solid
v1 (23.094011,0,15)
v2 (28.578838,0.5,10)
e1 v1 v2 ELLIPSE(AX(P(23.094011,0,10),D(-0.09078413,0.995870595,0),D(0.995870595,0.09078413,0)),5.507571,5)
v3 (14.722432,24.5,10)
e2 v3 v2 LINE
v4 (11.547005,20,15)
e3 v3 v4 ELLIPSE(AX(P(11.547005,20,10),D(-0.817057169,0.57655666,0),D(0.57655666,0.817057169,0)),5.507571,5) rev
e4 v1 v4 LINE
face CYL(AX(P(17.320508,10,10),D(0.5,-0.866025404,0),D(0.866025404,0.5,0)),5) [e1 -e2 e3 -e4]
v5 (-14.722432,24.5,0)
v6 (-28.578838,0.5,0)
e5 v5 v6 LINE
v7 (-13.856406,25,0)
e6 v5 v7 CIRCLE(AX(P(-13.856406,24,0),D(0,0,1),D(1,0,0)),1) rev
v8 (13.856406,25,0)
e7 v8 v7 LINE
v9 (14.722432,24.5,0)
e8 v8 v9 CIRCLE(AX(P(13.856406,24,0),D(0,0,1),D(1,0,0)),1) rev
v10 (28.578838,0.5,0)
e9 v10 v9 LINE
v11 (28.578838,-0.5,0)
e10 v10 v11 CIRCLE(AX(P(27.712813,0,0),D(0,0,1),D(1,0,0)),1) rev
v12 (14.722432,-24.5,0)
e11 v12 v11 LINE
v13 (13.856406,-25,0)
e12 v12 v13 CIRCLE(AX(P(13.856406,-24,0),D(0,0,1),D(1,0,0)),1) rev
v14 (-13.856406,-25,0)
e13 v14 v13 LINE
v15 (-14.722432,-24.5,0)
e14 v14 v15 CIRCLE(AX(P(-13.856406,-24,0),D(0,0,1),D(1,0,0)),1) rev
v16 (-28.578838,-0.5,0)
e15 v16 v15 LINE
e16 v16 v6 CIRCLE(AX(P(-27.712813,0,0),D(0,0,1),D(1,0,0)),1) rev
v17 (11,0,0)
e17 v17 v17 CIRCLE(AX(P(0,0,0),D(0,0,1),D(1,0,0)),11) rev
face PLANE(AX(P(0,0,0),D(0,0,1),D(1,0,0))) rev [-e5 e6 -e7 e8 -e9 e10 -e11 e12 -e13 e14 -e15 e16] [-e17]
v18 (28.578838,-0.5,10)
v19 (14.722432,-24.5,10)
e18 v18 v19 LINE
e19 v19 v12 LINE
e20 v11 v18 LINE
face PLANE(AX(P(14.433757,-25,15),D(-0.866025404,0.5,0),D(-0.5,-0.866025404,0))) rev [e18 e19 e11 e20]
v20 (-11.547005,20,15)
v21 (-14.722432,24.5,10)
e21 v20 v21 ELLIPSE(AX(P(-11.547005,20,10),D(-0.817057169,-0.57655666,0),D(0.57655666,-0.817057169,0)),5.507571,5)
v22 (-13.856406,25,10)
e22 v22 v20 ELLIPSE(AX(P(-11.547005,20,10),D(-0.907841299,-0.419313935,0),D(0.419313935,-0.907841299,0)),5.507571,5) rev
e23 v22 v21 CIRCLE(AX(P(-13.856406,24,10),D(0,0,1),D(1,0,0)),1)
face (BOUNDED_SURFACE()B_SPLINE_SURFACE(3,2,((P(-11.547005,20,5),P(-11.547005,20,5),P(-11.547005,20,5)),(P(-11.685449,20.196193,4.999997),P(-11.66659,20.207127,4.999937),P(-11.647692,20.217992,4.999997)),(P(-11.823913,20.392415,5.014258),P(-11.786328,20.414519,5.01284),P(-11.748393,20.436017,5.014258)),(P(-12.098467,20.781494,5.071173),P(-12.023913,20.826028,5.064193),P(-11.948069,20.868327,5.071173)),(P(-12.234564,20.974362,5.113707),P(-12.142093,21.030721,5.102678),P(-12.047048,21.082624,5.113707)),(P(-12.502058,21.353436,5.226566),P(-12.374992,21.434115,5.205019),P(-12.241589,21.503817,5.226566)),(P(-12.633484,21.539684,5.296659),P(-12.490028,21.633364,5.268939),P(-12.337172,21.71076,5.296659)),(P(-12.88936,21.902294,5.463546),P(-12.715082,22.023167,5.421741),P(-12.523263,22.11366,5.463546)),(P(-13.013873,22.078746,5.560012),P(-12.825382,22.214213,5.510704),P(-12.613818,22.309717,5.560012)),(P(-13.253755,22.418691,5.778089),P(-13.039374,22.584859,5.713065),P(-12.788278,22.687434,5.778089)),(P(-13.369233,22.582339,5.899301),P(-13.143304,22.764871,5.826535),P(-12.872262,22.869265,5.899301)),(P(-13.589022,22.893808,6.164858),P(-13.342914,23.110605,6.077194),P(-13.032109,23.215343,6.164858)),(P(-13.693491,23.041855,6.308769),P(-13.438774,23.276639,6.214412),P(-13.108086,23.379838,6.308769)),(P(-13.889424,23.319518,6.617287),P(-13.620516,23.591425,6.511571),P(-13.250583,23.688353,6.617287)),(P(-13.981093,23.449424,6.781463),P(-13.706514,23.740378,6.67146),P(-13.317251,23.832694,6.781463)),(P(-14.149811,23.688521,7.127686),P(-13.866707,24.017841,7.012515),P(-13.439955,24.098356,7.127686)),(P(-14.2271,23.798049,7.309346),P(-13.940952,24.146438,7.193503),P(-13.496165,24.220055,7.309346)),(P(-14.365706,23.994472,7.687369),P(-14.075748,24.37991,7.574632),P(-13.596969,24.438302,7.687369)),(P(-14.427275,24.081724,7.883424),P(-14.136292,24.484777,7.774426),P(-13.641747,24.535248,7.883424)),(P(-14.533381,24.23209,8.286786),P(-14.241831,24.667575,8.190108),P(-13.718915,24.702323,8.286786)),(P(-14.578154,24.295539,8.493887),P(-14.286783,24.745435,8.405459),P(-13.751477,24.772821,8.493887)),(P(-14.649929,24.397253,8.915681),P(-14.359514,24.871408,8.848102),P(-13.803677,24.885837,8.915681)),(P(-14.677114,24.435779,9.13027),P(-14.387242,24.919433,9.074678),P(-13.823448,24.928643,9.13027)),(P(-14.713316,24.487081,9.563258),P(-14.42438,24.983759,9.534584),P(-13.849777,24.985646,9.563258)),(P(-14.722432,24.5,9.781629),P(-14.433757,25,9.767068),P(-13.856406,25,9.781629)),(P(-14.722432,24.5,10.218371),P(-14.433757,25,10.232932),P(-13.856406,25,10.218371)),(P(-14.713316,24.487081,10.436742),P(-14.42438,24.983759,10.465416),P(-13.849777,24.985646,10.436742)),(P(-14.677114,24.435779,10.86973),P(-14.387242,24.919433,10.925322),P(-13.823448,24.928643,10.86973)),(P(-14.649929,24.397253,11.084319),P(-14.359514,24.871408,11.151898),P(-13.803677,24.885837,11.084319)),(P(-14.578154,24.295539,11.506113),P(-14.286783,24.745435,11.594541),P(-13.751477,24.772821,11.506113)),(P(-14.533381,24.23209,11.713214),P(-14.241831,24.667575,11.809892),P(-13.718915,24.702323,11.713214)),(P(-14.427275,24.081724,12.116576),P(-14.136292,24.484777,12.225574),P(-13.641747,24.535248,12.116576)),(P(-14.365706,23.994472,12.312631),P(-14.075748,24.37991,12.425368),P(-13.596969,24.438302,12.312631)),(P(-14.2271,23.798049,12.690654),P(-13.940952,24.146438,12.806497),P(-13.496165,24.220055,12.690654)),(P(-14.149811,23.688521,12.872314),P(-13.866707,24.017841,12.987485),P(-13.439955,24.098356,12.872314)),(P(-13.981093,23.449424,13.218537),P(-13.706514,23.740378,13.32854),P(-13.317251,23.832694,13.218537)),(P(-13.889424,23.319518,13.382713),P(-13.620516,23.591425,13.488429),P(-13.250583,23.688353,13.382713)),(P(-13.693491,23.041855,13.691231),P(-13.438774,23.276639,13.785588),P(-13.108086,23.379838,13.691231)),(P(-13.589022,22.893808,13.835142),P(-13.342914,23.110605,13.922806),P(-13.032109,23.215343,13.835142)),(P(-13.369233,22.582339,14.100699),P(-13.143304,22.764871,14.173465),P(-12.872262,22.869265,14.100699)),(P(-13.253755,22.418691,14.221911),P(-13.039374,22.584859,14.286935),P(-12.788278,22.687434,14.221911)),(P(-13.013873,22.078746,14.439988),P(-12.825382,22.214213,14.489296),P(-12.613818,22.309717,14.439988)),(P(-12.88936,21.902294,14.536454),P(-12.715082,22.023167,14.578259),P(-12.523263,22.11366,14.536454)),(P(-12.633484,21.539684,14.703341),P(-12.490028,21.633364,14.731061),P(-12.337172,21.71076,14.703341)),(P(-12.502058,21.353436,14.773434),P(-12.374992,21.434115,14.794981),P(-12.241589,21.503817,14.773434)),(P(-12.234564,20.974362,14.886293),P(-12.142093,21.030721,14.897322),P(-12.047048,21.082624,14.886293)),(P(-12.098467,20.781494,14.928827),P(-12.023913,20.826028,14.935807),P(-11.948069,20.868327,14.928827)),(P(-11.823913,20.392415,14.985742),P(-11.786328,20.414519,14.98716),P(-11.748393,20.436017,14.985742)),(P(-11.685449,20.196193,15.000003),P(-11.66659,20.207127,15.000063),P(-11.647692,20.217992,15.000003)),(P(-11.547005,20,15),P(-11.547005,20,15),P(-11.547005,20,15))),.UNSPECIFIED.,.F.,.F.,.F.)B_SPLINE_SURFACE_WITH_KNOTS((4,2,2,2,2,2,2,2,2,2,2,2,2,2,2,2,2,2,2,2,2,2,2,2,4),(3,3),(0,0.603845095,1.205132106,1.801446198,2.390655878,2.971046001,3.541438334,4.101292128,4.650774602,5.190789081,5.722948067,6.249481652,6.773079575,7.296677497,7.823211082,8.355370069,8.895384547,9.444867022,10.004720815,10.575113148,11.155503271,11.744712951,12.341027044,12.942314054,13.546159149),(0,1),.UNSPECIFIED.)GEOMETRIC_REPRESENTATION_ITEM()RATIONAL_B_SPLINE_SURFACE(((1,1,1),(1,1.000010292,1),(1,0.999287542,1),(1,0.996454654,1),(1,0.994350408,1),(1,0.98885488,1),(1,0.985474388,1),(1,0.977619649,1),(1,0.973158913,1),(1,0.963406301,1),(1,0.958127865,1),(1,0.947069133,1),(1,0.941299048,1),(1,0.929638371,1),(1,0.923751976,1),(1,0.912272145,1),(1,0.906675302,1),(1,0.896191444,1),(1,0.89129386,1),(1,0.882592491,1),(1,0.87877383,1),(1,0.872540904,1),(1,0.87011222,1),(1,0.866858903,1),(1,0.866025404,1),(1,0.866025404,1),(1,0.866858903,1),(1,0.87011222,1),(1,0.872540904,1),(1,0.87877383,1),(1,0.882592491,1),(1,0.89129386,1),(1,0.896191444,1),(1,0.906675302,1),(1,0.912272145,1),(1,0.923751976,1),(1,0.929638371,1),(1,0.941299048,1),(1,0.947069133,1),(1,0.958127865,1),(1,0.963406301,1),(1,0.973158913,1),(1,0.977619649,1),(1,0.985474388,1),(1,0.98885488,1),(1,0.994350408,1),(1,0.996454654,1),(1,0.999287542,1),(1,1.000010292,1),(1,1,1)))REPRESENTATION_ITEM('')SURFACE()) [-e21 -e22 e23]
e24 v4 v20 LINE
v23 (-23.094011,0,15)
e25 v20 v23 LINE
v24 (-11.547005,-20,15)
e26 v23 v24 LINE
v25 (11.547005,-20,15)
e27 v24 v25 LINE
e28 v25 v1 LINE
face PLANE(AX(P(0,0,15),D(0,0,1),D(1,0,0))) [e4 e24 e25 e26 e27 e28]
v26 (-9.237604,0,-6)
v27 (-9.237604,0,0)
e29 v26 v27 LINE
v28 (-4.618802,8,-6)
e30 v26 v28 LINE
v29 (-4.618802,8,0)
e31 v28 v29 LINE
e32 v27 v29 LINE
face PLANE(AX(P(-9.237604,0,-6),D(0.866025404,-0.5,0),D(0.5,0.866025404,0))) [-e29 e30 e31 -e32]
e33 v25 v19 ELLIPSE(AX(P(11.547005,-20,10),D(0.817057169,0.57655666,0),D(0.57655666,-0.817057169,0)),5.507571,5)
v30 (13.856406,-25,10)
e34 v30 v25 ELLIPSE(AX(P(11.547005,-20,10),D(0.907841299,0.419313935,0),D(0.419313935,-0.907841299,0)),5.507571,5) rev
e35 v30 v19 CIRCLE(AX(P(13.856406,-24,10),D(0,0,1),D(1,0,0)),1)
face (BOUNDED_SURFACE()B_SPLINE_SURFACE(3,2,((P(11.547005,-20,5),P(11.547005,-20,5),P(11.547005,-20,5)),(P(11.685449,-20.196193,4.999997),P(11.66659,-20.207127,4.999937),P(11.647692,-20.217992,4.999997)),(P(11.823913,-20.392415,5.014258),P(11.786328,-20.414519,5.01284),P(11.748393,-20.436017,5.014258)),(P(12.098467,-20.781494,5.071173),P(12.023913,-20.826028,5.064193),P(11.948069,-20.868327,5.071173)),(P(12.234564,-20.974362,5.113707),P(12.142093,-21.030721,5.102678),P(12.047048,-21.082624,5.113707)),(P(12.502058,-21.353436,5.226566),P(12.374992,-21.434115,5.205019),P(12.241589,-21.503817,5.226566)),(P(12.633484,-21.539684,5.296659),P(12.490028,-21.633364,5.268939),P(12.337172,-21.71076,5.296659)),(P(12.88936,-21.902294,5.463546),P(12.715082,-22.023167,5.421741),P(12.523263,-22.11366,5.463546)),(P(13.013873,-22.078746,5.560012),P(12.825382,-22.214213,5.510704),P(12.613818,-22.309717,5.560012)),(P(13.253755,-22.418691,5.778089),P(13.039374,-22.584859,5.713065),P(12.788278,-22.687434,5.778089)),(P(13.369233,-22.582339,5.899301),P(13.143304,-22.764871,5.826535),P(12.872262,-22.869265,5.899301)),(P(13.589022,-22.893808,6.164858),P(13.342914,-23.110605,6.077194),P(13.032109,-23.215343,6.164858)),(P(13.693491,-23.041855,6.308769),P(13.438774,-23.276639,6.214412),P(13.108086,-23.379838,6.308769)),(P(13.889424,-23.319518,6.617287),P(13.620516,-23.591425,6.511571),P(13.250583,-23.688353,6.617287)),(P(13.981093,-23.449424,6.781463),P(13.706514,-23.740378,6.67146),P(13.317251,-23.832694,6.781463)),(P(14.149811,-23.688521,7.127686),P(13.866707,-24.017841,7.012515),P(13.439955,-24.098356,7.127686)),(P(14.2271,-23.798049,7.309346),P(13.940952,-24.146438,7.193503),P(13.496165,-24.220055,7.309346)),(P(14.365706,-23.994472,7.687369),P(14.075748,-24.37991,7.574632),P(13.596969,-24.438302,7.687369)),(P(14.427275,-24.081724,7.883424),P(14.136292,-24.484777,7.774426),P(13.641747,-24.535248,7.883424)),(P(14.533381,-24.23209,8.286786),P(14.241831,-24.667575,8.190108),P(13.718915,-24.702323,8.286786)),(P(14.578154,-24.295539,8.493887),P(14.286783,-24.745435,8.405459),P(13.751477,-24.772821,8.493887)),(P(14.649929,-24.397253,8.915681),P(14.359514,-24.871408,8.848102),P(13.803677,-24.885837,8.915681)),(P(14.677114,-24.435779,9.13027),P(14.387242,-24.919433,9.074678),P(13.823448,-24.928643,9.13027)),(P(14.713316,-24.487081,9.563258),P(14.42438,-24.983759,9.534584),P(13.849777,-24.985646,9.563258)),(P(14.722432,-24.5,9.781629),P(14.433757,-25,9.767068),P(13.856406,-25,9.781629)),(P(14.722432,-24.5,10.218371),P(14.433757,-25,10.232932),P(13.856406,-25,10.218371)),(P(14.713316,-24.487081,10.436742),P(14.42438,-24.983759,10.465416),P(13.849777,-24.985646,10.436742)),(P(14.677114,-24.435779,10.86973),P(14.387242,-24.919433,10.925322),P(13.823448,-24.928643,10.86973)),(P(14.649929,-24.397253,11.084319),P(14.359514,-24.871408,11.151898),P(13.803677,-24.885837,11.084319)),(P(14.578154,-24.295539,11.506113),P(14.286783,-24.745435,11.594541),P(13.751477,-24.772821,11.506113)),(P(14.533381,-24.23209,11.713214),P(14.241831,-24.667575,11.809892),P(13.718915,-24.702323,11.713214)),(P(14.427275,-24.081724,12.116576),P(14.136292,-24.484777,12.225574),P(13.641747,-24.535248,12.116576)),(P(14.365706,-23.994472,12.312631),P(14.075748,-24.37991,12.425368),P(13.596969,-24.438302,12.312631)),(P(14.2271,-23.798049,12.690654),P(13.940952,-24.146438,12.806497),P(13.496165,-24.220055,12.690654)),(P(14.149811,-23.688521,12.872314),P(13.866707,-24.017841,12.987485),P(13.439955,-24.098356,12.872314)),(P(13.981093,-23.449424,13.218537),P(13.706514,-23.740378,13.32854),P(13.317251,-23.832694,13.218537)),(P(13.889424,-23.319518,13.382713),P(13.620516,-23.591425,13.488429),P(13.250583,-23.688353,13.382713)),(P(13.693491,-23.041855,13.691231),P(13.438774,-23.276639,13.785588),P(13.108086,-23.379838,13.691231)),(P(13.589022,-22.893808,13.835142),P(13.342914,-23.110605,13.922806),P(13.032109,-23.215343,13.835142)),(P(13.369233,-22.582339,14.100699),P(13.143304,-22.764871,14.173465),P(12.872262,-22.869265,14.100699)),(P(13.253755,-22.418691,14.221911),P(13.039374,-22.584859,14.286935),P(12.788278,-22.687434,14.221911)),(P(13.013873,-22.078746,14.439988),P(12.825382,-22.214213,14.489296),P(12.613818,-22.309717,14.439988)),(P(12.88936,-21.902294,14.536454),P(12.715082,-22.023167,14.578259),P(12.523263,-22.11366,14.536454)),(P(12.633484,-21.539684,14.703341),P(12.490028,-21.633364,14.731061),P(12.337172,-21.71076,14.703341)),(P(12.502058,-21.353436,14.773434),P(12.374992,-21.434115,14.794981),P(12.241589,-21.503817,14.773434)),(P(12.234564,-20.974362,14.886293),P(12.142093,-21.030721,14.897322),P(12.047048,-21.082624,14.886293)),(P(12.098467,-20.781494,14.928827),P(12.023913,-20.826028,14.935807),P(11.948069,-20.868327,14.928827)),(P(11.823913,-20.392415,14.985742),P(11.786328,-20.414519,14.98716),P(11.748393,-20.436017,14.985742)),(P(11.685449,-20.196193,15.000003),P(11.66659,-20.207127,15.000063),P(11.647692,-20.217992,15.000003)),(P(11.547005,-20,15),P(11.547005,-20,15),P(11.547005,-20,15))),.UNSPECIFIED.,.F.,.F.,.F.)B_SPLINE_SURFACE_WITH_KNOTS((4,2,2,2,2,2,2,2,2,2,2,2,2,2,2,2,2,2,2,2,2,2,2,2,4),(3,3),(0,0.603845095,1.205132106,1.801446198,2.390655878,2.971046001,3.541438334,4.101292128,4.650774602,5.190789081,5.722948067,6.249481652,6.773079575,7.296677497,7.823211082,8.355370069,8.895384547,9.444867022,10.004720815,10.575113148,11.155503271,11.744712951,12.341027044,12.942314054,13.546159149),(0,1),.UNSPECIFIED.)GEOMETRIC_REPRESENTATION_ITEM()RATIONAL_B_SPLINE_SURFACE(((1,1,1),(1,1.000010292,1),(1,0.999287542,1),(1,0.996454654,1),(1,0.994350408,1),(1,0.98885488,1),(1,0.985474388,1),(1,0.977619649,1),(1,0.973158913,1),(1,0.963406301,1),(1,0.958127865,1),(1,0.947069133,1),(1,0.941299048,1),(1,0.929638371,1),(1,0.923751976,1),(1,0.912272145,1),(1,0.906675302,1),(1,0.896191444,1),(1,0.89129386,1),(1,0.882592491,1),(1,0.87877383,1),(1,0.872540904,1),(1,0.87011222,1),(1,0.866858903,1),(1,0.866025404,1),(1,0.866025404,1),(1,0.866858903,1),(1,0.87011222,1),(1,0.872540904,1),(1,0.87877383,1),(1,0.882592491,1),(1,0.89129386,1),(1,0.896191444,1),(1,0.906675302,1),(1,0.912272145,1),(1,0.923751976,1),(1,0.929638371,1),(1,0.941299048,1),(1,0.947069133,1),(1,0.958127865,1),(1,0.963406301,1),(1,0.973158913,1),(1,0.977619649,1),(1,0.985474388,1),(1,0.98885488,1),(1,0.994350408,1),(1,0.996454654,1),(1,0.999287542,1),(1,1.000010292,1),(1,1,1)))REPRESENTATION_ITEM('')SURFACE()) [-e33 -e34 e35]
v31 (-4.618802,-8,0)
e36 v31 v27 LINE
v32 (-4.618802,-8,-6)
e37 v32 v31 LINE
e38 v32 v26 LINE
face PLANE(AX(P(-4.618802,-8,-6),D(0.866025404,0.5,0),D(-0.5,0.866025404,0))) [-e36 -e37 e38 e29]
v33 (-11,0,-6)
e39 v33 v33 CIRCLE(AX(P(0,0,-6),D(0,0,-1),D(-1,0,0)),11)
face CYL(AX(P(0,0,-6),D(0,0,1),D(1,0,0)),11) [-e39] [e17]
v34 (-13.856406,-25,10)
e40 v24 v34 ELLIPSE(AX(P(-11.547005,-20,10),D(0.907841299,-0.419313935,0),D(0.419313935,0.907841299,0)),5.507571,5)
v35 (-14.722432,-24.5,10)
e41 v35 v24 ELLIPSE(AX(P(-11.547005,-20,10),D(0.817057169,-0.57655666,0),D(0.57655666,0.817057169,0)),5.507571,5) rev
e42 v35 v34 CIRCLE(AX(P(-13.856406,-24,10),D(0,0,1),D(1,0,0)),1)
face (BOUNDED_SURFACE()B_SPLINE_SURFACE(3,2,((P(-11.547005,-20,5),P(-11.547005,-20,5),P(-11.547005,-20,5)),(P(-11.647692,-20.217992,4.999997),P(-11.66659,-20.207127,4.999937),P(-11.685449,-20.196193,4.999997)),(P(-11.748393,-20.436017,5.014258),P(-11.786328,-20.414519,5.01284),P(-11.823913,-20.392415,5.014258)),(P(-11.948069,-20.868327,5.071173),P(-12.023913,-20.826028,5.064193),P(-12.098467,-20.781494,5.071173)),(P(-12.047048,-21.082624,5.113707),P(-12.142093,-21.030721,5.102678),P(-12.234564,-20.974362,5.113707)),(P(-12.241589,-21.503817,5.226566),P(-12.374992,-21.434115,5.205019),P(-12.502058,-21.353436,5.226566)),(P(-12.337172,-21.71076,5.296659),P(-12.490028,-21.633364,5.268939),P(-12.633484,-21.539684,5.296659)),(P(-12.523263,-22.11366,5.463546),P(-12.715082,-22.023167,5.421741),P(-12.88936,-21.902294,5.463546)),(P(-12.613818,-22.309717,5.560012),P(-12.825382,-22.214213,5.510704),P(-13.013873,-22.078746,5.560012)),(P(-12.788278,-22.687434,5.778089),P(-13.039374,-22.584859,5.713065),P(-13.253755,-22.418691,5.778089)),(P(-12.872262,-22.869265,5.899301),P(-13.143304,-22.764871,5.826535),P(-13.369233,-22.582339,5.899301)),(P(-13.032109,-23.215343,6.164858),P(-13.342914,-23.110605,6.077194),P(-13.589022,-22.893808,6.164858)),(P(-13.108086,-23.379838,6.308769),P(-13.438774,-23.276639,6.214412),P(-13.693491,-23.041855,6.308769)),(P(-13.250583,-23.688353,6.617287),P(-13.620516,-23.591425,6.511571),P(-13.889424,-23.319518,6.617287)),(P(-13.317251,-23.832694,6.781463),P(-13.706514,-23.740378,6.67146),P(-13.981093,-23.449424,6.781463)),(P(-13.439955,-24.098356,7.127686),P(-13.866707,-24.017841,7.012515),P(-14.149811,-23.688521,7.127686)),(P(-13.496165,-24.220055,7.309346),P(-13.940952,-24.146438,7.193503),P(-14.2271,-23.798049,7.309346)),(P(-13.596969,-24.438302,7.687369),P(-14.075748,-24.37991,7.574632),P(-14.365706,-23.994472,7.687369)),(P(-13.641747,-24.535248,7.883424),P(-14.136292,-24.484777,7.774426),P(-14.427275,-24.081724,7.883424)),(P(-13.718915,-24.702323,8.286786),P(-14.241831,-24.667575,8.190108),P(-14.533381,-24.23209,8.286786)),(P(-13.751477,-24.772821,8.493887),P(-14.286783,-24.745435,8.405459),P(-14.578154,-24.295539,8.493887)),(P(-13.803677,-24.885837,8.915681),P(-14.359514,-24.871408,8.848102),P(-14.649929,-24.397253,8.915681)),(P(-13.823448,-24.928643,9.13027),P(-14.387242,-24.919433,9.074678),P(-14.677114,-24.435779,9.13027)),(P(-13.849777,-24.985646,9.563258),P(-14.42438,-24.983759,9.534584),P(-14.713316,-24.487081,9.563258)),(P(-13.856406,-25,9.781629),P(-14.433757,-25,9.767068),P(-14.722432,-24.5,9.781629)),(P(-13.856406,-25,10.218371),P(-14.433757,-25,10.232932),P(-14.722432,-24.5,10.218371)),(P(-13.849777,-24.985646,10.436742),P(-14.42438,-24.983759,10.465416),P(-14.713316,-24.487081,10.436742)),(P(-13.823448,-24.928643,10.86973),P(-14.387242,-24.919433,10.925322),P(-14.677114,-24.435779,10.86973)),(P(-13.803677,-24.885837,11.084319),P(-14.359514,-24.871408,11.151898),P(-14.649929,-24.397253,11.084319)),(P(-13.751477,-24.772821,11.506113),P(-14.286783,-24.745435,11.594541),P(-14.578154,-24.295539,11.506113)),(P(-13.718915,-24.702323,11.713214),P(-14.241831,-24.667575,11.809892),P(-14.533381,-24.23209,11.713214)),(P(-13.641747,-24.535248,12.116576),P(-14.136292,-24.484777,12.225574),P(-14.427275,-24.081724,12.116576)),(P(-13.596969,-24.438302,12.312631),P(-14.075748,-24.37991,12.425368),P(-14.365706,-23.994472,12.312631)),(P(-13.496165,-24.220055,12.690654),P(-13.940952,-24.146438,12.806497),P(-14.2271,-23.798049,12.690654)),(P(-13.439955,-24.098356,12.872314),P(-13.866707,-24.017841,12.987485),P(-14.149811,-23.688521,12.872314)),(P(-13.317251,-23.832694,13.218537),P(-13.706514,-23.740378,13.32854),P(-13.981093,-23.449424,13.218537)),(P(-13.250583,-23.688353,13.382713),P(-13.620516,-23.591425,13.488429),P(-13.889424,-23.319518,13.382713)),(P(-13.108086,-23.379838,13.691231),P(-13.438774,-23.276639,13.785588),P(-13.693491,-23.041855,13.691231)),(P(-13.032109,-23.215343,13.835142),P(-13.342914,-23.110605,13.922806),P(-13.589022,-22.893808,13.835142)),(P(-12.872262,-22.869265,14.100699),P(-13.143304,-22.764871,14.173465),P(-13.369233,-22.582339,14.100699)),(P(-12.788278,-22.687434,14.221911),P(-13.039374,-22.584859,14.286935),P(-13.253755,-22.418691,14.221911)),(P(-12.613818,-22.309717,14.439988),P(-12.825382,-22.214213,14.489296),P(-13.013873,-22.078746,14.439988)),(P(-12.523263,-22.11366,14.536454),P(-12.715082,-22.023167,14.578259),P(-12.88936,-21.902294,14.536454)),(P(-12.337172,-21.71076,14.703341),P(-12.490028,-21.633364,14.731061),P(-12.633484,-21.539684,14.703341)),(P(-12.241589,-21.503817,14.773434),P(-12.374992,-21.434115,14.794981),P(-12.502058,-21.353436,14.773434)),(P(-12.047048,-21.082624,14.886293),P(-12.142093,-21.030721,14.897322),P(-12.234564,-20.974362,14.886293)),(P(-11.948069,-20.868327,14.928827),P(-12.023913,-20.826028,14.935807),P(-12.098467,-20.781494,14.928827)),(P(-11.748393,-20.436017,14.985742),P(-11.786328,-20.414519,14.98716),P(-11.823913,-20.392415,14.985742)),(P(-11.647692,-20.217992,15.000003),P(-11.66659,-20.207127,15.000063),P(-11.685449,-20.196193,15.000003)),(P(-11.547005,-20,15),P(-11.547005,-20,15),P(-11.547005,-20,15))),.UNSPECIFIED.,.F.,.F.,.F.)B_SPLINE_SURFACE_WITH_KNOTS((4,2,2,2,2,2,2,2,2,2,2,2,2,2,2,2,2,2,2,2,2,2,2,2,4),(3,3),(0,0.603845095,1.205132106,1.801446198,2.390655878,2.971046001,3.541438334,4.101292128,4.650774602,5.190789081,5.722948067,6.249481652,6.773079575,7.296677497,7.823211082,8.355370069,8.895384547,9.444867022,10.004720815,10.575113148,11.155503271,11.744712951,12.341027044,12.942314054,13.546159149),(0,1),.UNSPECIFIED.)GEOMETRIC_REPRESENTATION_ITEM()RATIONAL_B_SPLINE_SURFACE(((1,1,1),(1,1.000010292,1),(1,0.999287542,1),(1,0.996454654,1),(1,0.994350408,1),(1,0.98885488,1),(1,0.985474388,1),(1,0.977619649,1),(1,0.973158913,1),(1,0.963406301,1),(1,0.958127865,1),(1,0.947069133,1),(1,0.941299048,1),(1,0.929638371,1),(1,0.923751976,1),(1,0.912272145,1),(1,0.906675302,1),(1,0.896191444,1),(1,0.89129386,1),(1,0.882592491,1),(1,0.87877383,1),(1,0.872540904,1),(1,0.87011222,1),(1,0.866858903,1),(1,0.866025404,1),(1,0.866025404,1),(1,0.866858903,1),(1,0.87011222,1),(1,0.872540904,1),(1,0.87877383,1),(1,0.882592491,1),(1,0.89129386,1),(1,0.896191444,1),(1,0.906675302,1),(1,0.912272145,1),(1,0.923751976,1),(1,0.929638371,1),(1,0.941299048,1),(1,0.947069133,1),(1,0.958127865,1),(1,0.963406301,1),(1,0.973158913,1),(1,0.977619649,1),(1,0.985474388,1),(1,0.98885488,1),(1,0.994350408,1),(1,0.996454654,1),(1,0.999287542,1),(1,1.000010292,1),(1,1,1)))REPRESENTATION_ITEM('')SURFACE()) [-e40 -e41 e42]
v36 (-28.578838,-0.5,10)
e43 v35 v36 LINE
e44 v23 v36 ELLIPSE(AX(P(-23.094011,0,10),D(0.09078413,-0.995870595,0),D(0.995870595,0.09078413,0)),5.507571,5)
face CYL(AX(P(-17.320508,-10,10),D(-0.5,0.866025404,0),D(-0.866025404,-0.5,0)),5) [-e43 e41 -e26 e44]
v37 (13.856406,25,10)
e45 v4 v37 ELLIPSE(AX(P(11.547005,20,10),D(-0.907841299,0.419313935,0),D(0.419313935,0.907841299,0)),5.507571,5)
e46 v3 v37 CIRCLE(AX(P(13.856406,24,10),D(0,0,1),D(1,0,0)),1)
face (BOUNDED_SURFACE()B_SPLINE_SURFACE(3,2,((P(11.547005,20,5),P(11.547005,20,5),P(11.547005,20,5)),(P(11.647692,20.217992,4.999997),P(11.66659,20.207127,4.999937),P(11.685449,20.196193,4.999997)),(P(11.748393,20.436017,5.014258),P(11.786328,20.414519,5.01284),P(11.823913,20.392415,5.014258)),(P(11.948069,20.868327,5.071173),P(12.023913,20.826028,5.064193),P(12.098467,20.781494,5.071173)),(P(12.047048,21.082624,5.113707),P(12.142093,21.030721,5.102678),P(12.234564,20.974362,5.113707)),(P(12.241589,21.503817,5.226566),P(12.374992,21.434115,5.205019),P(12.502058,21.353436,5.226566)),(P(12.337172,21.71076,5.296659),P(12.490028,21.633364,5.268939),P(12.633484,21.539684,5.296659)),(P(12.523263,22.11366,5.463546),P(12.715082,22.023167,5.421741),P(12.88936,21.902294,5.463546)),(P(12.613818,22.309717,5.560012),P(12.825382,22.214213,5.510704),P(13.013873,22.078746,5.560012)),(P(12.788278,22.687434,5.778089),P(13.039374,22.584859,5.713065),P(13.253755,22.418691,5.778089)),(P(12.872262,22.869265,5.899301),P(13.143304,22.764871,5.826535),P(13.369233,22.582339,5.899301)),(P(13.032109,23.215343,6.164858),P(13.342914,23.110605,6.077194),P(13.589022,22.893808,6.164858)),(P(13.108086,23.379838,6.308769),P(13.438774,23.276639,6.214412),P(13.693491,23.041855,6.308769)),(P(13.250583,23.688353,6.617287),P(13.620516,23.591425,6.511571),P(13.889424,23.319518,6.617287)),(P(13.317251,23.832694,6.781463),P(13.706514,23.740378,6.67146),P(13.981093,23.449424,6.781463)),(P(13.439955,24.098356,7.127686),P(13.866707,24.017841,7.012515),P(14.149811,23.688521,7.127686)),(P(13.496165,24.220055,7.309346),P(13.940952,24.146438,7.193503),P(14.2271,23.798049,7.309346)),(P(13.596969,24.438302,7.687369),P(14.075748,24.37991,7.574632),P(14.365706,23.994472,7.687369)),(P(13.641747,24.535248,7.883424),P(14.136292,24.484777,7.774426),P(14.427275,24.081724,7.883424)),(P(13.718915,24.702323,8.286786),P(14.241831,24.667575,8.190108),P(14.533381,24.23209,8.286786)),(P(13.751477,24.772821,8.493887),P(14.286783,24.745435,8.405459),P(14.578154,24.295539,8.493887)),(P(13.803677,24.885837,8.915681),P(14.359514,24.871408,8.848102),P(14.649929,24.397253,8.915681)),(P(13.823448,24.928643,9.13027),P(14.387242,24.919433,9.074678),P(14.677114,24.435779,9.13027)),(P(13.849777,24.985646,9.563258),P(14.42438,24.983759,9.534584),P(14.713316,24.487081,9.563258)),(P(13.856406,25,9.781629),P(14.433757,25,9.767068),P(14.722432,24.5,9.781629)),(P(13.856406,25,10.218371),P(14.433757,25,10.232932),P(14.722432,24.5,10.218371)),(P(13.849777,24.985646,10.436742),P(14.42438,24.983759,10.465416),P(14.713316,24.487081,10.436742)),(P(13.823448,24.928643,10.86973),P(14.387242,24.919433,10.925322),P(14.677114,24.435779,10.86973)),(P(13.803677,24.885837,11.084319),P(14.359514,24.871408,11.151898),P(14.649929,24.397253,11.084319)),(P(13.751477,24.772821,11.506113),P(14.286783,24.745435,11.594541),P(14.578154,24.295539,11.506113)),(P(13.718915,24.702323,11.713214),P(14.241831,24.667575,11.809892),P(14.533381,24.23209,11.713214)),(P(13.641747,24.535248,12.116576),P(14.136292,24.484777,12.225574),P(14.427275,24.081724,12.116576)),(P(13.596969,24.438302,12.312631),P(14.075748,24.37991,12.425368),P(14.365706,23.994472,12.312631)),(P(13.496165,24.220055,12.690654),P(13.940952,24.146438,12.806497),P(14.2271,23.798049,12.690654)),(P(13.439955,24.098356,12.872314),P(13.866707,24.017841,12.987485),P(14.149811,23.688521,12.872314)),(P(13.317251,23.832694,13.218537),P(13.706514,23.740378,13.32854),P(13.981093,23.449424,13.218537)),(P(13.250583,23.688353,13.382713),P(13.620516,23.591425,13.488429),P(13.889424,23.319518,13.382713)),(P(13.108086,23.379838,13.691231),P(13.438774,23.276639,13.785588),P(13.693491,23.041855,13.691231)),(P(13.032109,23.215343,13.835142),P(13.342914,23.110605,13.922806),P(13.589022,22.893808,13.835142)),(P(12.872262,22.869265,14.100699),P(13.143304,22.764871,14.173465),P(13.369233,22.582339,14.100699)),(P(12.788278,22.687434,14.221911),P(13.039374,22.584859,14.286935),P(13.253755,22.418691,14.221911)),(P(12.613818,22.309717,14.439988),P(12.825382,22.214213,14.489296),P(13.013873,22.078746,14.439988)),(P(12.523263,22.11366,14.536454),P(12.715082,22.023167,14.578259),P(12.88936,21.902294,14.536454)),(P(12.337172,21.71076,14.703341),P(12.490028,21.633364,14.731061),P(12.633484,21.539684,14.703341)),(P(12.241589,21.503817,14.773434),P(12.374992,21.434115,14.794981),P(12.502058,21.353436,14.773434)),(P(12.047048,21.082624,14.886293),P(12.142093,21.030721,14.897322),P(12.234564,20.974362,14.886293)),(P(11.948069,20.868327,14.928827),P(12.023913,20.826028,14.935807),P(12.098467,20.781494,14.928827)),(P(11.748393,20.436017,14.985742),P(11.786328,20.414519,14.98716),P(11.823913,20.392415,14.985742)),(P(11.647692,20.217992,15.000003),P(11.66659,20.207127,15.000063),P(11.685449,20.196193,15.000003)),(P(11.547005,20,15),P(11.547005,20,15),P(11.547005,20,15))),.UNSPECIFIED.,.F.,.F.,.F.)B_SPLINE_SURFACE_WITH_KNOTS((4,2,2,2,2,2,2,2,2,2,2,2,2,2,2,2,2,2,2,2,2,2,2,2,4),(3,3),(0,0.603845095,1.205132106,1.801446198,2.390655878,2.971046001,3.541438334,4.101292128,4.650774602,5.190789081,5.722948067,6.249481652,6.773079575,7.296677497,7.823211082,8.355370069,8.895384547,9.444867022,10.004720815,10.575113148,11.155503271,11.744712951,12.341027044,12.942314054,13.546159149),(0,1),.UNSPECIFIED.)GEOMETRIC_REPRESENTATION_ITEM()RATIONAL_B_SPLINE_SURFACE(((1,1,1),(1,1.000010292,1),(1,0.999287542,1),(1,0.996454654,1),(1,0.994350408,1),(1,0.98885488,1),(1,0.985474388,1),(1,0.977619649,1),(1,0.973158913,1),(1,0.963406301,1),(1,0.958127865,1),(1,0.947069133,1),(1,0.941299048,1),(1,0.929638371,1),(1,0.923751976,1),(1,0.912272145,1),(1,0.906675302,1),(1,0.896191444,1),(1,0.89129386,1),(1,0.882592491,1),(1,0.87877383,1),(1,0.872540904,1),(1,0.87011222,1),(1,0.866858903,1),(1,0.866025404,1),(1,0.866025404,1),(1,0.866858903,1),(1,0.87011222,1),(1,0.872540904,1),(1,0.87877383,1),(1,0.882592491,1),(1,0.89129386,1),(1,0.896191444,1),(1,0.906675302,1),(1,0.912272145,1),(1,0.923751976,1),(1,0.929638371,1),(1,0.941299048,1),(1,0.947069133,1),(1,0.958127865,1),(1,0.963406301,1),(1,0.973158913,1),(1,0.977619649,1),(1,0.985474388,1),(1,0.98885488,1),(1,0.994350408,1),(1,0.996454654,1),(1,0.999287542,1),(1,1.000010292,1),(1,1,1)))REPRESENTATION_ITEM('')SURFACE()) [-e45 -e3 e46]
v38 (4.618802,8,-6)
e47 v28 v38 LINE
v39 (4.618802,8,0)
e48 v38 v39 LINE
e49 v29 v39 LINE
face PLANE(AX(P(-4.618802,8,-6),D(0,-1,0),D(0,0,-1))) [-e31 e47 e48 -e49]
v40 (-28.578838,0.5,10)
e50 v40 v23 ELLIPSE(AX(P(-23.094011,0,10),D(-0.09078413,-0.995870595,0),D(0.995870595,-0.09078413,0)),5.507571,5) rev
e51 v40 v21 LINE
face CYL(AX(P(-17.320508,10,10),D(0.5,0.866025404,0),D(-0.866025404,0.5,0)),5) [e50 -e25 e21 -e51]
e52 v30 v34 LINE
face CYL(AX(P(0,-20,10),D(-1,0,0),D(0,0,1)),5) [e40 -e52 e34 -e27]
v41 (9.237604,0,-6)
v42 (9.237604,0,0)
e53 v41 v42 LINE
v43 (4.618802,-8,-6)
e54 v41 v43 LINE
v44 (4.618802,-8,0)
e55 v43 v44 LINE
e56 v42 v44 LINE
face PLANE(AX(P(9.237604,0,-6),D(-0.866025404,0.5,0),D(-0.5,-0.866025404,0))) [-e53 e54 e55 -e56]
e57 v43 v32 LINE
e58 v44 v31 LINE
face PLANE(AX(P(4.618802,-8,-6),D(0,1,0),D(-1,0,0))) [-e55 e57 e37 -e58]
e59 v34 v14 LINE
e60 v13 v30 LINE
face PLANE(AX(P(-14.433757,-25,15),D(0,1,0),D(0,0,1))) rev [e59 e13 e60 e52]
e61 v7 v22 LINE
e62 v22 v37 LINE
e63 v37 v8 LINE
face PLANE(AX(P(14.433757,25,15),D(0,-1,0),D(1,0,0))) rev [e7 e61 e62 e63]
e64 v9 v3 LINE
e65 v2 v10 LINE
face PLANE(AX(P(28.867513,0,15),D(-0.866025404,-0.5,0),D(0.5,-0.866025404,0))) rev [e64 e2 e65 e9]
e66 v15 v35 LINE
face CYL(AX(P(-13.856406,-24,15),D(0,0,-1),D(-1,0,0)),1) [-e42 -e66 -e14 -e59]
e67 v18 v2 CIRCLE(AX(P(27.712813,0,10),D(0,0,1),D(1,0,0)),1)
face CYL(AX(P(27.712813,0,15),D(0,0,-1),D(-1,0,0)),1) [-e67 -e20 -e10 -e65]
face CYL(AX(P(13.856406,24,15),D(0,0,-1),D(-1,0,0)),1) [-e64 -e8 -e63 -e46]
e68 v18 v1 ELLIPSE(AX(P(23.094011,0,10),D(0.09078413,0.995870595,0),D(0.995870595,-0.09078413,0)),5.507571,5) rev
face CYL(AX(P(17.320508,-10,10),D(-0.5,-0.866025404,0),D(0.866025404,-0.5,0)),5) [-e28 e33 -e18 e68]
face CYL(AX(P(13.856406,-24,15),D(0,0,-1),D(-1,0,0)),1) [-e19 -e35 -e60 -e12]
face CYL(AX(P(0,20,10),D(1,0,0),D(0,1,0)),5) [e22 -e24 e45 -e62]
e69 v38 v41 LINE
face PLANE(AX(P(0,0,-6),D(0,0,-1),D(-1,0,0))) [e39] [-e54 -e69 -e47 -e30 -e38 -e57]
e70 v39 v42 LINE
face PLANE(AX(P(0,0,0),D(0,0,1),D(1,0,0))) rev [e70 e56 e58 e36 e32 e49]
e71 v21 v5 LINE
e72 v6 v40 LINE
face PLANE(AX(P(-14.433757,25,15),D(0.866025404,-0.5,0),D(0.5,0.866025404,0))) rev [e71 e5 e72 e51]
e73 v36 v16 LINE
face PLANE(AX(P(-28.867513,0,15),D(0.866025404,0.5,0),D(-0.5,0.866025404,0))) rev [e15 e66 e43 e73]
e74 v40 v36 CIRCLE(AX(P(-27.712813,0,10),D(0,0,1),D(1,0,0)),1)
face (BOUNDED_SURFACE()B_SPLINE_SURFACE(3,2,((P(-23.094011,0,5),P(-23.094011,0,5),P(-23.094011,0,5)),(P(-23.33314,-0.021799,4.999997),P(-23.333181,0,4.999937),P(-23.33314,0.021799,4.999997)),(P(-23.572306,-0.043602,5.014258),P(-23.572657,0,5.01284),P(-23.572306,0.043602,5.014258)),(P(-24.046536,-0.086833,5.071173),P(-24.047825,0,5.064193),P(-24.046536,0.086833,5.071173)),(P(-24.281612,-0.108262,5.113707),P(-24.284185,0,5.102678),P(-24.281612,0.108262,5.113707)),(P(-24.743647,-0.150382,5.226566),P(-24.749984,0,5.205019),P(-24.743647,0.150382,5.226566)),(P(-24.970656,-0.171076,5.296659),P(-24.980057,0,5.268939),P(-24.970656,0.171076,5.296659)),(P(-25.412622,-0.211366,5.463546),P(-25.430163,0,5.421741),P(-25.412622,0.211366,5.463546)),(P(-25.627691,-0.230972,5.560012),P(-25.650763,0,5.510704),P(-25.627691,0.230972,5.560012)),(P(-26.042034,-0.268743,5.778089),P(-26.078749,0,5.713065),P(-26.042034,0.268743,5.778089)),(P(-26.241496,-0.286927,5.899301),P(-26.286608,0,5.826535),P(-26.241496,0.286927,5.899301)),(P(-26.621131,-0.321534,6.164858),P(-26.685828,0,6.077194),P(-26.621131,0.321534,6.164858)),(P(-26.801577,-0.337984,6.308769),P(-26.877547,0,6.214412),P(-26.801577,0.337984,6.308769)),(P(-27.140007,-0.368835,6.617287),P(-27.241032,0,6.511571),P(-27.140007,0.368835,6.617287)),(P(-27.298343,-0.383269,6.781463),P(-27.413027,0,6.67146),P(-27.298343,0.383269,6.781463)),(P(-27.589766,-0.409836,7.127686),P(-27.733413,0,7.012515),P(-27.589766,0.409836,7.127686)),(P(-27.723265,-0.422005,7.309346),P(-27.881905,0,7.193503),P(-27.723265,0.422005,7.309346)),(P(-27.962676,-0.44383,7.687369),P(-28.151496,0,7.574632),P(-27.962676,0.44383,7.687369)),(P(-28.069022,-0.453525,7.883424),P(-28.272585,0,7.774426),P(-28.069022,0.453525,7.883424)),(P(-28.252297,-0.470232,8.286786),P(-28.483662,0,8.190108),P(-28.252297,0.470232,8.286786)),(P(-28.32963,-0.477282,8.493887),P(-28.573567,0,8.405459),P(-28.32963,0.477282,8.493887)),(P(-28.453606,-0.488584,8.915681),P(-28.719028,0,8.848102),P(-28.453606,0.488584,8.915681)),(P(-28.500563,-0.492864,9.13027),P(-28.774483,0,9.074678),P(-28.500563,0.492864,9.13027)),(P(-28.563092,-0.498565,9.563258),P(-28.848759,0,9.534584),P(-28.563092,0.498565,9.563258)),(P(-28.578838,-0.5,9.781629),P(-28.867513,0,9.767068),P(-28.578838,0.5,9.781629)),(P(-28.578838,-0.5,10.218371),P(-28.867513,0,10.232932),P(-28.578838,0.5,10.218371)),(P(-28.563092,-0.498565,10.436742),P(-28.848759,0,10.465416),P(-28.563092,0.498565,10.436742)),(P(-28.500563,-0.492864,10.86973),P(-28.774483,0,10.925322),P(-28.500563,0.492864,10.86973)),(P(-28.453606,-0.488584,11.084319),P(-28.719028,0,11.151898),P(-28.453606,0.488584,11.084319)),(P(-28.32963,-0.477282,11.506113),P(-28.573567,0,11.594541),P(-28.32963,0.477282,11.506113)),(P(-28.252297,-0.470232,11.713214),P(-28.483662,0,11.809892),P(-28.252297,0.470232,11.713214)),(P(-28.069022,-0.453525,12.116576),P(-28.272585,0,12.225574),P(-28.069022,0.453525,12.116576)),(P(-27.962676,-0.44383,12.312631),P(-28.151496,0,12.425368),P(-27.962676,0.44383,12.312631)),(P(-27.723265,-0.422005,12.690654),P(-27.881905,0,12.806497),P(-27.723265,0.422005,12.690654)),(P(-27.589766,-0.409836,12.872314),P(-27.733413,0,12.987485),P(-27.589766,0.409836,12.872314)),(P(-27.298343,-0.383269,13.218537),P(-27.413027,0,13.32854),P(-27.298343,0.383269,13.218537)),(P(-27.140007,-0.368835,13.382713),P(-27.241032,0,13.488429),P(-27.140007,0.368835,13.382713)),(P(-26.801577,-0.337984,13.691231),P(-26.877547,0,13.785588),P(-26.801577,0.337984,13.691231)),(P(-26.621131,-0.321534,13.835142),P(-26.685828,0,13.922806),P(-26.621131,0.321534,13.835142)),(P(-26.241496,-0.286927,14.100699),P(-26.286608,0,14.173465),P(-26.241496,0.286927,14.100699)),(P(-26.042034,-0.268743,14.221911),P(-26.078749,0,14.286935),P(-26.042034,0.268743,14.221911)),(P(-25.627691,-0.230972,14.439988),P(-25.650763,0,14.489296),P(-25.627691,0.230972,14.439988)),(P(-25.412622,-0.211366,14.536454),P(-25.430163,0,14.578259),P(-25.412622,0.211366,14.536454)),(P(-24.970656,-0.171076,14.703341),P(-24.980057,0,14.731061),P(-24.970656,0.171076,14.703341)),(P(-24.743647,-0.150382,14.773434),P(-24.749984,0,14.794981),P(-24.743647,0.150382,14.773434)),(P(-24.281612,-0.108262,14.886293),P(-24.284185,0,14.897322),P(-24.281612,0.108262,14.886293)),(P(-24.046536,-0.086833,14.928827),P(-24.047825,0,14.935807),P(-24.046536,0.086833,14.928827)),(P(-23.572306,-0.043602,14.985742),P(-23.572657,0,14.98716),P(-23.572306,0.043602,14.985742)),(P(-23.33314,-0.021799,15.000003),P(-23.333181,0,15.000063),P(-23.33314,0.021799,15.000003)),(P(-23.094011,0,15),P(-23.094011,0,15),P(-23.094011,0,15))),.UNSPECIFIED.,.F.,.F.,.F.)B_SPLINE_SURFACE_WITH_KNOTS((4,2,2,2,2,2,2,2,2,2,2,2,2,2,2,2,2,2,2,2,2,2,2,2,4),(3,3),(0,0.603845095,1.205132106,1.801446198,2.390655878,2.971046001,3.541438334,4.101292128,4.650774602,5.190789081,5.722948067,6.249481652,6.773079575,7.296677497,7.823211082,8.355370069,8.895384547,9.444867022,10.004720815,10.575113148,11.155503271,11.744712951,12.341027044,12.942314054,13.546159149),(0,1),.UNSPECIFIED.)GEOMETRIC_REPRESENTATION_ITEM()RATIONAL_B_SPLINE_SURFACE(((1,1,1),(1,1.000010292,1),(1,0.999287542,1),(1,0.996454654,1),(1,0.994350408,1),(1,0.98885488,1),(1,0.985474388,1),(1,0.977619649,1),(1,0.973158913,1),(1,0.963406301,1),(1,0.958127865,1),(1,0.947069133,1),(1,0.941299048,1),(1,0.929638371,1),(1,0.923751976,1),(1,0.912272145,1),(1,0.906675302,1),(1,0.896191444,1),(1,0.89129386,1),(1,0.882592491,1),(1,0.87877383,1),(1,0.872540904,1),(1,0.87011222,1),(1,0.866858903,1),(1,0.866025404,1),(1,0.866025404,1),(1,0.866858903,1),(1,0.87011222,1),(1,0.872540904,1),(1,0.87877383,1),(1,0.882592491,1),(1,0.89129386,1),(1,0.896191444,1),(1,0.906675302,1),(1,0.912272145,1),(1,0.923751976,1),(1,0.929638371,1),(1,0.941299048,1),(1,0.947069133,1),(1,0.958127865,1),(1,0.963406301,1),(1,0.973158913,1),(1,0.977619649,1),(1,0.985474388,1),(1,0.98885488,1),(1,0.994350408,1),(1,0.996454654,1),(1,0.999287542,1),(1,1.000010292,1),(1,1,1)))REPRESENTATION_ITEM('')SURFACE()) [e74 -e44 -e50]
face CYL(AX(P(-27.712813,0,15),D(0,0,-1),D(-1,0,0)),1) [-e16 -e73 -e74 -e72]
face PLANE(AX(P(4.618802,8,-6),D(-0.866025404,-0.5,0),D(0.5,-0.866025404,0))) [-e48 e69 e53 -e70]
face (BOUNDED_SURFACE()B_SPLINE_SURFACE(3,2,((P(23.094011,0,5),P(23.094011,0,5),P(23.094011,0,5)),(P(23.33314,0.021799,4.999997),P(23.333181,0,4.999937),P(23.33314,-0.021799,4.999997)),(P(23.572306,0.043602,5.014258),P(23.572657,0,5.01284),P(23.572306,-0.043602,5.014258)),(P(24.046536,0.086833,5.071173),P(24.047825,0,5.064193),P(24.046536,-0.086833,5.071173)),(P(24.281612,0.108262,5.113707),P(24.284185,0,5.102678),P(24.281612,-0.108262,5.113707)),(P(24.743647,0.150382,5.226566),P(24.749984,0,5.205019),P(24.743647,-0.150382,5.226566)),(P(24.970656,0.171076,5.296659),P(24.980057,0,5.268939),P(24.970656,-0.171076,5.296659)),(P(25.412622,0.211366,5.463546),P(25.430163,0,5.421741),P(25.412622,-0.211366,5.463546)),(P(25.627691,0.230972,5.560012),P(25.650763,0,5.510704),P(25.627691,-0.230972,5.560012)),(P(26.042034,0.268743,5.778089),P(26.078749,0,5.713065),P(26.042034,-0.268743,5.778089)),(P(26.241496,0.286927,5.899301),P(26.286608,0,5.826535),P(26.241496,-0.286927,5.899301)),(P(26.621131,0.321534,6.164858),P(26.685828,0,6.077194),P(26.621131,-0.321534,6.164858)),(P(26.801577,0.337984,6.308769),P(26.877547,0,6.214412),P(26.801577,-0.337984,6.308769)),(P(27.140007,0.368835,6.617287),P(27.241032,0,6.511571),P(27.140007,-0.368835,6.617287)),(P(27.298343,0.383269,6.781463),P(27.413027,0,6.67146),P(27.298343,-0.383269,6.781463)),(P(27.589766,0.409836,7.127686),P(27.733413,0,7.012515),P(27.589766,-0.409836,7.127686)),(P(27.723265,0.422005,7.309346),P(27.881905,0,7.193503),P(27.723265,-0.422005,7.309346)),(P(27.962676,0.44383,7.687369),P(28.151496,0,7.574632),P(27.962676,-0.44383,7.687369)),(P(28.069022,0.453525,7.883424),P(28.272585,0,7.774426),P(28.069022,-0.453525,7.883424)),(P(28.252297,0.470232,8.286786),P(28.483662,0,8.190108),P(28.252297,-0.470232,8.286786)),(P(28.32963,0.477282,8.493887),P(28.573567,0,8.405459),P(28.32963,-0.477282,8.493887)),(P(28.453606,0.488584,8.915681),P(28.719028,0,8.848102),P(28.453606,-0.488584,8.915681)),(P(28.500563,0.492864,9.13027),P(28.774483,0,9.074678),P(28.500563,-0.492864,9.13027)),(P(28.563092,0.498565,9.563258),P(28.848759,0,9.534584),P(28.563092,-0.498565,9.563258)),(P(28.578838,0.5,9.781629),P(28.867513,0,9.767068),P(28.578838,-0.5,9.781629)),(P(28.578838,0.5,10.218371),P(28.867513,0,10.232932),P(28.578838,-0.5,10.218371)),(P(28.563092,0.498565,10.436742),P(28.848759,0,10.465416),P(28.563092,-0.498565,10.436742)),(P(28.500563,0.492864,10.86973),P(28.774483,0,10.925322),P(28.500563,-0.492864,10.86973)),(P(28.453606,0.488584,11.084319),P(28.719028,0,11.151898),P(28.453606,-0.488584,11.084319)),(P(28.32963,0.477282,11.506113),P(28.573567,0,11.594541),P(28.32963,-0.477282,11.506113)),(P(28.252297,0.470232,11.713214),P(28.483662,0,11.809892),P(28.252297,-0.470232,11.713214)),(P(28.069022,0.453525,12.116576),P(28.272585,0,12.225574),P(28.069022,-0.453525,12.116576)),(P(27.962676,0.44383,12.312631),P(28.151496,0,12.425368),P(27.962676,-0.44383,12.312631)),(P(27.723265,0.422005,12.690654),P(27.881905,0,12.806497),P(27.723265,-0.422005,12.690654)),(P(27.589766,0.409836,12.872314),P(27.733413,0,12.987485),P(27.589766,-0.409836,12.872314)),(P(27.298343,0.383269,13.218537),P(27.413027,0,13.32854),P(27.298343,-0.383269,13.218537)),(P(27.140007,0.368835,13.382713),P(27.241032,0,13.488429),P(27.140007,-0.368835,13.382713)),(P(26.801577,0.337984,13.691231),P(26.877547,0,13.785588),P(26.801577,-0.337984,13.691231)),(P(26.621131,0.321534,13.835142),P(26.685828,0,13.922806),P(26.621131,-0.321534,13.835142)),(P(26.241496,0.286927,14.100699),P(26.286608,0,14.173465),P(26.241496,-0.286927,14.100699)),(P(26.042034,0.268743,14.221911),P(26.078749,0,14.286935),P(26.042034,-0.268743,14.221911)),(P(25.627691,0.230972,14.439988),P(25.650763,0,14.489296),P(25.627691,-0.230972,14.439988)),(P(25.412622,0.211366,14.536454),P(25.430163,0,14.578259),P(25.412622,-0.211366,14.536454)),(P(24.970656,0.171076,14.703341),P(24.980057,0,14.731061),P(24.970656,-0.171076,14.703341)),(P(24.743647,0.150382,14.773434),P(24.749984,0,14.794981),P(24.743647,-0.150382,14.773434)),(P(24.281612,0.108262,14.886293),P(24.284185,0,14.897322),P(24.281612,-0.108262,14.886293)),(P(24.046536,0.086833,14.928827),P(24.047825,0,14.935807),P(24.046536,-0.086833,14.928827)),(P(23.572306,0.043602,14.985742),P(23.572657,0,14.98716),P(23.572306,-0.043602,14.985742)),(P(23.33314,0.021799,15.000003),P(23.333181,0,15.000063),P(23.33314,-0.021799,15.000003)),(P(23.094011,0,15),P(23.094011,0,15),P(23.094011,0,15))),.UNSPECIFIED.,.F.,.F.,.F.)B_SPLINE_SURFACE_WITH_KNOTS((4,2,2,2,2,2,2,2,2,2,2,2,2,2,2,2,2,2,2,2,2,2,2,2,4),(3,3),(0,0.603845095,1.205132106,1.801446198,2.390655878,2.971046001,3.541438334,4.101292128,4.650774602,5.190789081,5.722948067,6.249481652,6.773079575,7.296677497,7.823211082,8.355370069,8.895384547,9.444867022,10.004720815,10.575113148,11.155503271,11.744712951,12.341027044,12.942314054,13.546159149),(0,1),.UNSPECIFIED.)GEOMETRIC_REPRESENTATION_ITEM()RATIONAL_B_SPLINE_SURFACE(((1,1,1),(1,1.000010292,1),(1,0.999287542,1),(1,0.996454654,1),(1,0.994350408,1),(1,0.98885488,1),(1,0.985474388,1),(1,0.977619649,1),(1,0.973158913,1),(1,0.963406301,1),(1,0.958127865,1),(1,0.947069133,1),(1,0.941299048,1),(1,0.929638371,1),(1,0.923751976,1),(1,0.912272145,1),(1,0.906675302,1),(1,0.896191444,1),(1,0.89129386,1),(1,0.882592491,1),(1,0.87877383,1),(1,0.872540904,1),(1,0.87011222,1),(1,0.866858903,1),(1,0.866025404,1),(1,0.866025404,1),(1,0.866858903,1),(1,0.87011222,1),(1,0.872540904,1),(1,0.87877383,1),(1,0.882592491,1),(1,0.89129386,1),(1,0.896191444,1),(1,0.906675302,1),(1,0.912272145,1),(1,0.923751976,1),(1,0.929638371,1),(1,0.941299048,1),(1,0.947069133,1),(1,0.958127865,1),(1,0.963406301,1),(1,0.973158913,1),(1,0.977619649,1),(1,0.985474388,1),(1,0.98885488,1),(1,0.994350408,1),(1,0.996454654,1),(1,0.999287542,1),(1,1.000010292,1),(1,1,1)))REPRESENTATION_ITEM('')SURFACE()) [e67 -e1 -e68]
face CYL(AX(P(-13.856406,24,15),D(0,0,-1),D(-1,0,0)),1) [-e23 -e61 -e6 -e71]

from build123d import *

# Parameters (mm, degrees)
DODANIE_WYCI_GNI_CIE1_DEPTH = 15
ZAOKR_GLENIE1_R             = 5
ZAOKR_GLENIE2_R             = 1
SZKIC3_R                    = 11
DODANIE_WYCI_GNI_CIE2_DEPTH = 6


with BuildPart() as part:
    # Szkic1 → Dodanie-wyciągnięcie1 (new body)
    with BuildSketch(Plane.XY):
        Polygon((14.43375673, -25), (28.867513459, 0), (14.43375673, 25), (-14.43375673, 25), (-28.867513459, 0), (-14.43375673, -25), align=None)
    extrude(amount=DODANIE_WYCI_GNI_CIE1_DEPTH)

    # Zaokrąglenie1
    zaokr_glenie1_edges = [part.edges().sort_by_distance(p)[0] for p in [
        (0, 25, 15),
        (-21.650635095, 12.5, 15),
        (-21.650635095, -12.5, 15),
        (0, -25, 15),
        (21.650635095, -12.5, 15),
        (21.650635095, 12.5, 15),
    ]]
    fillet(zaokr_glenie1_edges, radius=ZAOKR_GLENIE1_R)

    # Zaokrąglenie2
    zaokr_glenie2_edges = [part.edges().sort_by_distance(p)[0] for p in [
        (-13.514121691, 23.407145389, 13.65942076),
        (-27.02824329, 0, 13.659420835),
        (-13.514121691, -23.407145389, 13.65942076),
        (13.514121691, -23.407145389, 13.65942076),
        (27.028243383, 0, 13.65942076),
        (13.514121691, 23.407145389, 13.65942076),
        (-14.43375673, 25, 5),
        (-28.867513459, 0, 5),
        (-14.43375673, -25, 5),
        (14.43375673, -25, 5),
        (28.867513459, 0, 5),
        (14.43375673, 25, 5),
    ]]
    fillet(zaokr_glenie2_edges, radius=ZAOKR_GLENIE2_R)

    # Szkic3 → Dodanie-wyciągnięcie2 (add)
    with BuildSketch(Plane(origin=(0, 0, 0), x_dir=(-1, 0, 0), z_dir=(0, 0, -1))):
        Circle(SZKIC3_R)
        Polygon((4.618802154, -8), (9.237604307, 0), (4.618802154, 8), (-4.618802154, 8), (-9.237604307, 0), (-4.618802154, -8), align=None, mode=Mode.SUBTRACT)
    extrude(amount=DODANIE_WYCI_GNI_CIE2_DEPTH)


solid = part.part
